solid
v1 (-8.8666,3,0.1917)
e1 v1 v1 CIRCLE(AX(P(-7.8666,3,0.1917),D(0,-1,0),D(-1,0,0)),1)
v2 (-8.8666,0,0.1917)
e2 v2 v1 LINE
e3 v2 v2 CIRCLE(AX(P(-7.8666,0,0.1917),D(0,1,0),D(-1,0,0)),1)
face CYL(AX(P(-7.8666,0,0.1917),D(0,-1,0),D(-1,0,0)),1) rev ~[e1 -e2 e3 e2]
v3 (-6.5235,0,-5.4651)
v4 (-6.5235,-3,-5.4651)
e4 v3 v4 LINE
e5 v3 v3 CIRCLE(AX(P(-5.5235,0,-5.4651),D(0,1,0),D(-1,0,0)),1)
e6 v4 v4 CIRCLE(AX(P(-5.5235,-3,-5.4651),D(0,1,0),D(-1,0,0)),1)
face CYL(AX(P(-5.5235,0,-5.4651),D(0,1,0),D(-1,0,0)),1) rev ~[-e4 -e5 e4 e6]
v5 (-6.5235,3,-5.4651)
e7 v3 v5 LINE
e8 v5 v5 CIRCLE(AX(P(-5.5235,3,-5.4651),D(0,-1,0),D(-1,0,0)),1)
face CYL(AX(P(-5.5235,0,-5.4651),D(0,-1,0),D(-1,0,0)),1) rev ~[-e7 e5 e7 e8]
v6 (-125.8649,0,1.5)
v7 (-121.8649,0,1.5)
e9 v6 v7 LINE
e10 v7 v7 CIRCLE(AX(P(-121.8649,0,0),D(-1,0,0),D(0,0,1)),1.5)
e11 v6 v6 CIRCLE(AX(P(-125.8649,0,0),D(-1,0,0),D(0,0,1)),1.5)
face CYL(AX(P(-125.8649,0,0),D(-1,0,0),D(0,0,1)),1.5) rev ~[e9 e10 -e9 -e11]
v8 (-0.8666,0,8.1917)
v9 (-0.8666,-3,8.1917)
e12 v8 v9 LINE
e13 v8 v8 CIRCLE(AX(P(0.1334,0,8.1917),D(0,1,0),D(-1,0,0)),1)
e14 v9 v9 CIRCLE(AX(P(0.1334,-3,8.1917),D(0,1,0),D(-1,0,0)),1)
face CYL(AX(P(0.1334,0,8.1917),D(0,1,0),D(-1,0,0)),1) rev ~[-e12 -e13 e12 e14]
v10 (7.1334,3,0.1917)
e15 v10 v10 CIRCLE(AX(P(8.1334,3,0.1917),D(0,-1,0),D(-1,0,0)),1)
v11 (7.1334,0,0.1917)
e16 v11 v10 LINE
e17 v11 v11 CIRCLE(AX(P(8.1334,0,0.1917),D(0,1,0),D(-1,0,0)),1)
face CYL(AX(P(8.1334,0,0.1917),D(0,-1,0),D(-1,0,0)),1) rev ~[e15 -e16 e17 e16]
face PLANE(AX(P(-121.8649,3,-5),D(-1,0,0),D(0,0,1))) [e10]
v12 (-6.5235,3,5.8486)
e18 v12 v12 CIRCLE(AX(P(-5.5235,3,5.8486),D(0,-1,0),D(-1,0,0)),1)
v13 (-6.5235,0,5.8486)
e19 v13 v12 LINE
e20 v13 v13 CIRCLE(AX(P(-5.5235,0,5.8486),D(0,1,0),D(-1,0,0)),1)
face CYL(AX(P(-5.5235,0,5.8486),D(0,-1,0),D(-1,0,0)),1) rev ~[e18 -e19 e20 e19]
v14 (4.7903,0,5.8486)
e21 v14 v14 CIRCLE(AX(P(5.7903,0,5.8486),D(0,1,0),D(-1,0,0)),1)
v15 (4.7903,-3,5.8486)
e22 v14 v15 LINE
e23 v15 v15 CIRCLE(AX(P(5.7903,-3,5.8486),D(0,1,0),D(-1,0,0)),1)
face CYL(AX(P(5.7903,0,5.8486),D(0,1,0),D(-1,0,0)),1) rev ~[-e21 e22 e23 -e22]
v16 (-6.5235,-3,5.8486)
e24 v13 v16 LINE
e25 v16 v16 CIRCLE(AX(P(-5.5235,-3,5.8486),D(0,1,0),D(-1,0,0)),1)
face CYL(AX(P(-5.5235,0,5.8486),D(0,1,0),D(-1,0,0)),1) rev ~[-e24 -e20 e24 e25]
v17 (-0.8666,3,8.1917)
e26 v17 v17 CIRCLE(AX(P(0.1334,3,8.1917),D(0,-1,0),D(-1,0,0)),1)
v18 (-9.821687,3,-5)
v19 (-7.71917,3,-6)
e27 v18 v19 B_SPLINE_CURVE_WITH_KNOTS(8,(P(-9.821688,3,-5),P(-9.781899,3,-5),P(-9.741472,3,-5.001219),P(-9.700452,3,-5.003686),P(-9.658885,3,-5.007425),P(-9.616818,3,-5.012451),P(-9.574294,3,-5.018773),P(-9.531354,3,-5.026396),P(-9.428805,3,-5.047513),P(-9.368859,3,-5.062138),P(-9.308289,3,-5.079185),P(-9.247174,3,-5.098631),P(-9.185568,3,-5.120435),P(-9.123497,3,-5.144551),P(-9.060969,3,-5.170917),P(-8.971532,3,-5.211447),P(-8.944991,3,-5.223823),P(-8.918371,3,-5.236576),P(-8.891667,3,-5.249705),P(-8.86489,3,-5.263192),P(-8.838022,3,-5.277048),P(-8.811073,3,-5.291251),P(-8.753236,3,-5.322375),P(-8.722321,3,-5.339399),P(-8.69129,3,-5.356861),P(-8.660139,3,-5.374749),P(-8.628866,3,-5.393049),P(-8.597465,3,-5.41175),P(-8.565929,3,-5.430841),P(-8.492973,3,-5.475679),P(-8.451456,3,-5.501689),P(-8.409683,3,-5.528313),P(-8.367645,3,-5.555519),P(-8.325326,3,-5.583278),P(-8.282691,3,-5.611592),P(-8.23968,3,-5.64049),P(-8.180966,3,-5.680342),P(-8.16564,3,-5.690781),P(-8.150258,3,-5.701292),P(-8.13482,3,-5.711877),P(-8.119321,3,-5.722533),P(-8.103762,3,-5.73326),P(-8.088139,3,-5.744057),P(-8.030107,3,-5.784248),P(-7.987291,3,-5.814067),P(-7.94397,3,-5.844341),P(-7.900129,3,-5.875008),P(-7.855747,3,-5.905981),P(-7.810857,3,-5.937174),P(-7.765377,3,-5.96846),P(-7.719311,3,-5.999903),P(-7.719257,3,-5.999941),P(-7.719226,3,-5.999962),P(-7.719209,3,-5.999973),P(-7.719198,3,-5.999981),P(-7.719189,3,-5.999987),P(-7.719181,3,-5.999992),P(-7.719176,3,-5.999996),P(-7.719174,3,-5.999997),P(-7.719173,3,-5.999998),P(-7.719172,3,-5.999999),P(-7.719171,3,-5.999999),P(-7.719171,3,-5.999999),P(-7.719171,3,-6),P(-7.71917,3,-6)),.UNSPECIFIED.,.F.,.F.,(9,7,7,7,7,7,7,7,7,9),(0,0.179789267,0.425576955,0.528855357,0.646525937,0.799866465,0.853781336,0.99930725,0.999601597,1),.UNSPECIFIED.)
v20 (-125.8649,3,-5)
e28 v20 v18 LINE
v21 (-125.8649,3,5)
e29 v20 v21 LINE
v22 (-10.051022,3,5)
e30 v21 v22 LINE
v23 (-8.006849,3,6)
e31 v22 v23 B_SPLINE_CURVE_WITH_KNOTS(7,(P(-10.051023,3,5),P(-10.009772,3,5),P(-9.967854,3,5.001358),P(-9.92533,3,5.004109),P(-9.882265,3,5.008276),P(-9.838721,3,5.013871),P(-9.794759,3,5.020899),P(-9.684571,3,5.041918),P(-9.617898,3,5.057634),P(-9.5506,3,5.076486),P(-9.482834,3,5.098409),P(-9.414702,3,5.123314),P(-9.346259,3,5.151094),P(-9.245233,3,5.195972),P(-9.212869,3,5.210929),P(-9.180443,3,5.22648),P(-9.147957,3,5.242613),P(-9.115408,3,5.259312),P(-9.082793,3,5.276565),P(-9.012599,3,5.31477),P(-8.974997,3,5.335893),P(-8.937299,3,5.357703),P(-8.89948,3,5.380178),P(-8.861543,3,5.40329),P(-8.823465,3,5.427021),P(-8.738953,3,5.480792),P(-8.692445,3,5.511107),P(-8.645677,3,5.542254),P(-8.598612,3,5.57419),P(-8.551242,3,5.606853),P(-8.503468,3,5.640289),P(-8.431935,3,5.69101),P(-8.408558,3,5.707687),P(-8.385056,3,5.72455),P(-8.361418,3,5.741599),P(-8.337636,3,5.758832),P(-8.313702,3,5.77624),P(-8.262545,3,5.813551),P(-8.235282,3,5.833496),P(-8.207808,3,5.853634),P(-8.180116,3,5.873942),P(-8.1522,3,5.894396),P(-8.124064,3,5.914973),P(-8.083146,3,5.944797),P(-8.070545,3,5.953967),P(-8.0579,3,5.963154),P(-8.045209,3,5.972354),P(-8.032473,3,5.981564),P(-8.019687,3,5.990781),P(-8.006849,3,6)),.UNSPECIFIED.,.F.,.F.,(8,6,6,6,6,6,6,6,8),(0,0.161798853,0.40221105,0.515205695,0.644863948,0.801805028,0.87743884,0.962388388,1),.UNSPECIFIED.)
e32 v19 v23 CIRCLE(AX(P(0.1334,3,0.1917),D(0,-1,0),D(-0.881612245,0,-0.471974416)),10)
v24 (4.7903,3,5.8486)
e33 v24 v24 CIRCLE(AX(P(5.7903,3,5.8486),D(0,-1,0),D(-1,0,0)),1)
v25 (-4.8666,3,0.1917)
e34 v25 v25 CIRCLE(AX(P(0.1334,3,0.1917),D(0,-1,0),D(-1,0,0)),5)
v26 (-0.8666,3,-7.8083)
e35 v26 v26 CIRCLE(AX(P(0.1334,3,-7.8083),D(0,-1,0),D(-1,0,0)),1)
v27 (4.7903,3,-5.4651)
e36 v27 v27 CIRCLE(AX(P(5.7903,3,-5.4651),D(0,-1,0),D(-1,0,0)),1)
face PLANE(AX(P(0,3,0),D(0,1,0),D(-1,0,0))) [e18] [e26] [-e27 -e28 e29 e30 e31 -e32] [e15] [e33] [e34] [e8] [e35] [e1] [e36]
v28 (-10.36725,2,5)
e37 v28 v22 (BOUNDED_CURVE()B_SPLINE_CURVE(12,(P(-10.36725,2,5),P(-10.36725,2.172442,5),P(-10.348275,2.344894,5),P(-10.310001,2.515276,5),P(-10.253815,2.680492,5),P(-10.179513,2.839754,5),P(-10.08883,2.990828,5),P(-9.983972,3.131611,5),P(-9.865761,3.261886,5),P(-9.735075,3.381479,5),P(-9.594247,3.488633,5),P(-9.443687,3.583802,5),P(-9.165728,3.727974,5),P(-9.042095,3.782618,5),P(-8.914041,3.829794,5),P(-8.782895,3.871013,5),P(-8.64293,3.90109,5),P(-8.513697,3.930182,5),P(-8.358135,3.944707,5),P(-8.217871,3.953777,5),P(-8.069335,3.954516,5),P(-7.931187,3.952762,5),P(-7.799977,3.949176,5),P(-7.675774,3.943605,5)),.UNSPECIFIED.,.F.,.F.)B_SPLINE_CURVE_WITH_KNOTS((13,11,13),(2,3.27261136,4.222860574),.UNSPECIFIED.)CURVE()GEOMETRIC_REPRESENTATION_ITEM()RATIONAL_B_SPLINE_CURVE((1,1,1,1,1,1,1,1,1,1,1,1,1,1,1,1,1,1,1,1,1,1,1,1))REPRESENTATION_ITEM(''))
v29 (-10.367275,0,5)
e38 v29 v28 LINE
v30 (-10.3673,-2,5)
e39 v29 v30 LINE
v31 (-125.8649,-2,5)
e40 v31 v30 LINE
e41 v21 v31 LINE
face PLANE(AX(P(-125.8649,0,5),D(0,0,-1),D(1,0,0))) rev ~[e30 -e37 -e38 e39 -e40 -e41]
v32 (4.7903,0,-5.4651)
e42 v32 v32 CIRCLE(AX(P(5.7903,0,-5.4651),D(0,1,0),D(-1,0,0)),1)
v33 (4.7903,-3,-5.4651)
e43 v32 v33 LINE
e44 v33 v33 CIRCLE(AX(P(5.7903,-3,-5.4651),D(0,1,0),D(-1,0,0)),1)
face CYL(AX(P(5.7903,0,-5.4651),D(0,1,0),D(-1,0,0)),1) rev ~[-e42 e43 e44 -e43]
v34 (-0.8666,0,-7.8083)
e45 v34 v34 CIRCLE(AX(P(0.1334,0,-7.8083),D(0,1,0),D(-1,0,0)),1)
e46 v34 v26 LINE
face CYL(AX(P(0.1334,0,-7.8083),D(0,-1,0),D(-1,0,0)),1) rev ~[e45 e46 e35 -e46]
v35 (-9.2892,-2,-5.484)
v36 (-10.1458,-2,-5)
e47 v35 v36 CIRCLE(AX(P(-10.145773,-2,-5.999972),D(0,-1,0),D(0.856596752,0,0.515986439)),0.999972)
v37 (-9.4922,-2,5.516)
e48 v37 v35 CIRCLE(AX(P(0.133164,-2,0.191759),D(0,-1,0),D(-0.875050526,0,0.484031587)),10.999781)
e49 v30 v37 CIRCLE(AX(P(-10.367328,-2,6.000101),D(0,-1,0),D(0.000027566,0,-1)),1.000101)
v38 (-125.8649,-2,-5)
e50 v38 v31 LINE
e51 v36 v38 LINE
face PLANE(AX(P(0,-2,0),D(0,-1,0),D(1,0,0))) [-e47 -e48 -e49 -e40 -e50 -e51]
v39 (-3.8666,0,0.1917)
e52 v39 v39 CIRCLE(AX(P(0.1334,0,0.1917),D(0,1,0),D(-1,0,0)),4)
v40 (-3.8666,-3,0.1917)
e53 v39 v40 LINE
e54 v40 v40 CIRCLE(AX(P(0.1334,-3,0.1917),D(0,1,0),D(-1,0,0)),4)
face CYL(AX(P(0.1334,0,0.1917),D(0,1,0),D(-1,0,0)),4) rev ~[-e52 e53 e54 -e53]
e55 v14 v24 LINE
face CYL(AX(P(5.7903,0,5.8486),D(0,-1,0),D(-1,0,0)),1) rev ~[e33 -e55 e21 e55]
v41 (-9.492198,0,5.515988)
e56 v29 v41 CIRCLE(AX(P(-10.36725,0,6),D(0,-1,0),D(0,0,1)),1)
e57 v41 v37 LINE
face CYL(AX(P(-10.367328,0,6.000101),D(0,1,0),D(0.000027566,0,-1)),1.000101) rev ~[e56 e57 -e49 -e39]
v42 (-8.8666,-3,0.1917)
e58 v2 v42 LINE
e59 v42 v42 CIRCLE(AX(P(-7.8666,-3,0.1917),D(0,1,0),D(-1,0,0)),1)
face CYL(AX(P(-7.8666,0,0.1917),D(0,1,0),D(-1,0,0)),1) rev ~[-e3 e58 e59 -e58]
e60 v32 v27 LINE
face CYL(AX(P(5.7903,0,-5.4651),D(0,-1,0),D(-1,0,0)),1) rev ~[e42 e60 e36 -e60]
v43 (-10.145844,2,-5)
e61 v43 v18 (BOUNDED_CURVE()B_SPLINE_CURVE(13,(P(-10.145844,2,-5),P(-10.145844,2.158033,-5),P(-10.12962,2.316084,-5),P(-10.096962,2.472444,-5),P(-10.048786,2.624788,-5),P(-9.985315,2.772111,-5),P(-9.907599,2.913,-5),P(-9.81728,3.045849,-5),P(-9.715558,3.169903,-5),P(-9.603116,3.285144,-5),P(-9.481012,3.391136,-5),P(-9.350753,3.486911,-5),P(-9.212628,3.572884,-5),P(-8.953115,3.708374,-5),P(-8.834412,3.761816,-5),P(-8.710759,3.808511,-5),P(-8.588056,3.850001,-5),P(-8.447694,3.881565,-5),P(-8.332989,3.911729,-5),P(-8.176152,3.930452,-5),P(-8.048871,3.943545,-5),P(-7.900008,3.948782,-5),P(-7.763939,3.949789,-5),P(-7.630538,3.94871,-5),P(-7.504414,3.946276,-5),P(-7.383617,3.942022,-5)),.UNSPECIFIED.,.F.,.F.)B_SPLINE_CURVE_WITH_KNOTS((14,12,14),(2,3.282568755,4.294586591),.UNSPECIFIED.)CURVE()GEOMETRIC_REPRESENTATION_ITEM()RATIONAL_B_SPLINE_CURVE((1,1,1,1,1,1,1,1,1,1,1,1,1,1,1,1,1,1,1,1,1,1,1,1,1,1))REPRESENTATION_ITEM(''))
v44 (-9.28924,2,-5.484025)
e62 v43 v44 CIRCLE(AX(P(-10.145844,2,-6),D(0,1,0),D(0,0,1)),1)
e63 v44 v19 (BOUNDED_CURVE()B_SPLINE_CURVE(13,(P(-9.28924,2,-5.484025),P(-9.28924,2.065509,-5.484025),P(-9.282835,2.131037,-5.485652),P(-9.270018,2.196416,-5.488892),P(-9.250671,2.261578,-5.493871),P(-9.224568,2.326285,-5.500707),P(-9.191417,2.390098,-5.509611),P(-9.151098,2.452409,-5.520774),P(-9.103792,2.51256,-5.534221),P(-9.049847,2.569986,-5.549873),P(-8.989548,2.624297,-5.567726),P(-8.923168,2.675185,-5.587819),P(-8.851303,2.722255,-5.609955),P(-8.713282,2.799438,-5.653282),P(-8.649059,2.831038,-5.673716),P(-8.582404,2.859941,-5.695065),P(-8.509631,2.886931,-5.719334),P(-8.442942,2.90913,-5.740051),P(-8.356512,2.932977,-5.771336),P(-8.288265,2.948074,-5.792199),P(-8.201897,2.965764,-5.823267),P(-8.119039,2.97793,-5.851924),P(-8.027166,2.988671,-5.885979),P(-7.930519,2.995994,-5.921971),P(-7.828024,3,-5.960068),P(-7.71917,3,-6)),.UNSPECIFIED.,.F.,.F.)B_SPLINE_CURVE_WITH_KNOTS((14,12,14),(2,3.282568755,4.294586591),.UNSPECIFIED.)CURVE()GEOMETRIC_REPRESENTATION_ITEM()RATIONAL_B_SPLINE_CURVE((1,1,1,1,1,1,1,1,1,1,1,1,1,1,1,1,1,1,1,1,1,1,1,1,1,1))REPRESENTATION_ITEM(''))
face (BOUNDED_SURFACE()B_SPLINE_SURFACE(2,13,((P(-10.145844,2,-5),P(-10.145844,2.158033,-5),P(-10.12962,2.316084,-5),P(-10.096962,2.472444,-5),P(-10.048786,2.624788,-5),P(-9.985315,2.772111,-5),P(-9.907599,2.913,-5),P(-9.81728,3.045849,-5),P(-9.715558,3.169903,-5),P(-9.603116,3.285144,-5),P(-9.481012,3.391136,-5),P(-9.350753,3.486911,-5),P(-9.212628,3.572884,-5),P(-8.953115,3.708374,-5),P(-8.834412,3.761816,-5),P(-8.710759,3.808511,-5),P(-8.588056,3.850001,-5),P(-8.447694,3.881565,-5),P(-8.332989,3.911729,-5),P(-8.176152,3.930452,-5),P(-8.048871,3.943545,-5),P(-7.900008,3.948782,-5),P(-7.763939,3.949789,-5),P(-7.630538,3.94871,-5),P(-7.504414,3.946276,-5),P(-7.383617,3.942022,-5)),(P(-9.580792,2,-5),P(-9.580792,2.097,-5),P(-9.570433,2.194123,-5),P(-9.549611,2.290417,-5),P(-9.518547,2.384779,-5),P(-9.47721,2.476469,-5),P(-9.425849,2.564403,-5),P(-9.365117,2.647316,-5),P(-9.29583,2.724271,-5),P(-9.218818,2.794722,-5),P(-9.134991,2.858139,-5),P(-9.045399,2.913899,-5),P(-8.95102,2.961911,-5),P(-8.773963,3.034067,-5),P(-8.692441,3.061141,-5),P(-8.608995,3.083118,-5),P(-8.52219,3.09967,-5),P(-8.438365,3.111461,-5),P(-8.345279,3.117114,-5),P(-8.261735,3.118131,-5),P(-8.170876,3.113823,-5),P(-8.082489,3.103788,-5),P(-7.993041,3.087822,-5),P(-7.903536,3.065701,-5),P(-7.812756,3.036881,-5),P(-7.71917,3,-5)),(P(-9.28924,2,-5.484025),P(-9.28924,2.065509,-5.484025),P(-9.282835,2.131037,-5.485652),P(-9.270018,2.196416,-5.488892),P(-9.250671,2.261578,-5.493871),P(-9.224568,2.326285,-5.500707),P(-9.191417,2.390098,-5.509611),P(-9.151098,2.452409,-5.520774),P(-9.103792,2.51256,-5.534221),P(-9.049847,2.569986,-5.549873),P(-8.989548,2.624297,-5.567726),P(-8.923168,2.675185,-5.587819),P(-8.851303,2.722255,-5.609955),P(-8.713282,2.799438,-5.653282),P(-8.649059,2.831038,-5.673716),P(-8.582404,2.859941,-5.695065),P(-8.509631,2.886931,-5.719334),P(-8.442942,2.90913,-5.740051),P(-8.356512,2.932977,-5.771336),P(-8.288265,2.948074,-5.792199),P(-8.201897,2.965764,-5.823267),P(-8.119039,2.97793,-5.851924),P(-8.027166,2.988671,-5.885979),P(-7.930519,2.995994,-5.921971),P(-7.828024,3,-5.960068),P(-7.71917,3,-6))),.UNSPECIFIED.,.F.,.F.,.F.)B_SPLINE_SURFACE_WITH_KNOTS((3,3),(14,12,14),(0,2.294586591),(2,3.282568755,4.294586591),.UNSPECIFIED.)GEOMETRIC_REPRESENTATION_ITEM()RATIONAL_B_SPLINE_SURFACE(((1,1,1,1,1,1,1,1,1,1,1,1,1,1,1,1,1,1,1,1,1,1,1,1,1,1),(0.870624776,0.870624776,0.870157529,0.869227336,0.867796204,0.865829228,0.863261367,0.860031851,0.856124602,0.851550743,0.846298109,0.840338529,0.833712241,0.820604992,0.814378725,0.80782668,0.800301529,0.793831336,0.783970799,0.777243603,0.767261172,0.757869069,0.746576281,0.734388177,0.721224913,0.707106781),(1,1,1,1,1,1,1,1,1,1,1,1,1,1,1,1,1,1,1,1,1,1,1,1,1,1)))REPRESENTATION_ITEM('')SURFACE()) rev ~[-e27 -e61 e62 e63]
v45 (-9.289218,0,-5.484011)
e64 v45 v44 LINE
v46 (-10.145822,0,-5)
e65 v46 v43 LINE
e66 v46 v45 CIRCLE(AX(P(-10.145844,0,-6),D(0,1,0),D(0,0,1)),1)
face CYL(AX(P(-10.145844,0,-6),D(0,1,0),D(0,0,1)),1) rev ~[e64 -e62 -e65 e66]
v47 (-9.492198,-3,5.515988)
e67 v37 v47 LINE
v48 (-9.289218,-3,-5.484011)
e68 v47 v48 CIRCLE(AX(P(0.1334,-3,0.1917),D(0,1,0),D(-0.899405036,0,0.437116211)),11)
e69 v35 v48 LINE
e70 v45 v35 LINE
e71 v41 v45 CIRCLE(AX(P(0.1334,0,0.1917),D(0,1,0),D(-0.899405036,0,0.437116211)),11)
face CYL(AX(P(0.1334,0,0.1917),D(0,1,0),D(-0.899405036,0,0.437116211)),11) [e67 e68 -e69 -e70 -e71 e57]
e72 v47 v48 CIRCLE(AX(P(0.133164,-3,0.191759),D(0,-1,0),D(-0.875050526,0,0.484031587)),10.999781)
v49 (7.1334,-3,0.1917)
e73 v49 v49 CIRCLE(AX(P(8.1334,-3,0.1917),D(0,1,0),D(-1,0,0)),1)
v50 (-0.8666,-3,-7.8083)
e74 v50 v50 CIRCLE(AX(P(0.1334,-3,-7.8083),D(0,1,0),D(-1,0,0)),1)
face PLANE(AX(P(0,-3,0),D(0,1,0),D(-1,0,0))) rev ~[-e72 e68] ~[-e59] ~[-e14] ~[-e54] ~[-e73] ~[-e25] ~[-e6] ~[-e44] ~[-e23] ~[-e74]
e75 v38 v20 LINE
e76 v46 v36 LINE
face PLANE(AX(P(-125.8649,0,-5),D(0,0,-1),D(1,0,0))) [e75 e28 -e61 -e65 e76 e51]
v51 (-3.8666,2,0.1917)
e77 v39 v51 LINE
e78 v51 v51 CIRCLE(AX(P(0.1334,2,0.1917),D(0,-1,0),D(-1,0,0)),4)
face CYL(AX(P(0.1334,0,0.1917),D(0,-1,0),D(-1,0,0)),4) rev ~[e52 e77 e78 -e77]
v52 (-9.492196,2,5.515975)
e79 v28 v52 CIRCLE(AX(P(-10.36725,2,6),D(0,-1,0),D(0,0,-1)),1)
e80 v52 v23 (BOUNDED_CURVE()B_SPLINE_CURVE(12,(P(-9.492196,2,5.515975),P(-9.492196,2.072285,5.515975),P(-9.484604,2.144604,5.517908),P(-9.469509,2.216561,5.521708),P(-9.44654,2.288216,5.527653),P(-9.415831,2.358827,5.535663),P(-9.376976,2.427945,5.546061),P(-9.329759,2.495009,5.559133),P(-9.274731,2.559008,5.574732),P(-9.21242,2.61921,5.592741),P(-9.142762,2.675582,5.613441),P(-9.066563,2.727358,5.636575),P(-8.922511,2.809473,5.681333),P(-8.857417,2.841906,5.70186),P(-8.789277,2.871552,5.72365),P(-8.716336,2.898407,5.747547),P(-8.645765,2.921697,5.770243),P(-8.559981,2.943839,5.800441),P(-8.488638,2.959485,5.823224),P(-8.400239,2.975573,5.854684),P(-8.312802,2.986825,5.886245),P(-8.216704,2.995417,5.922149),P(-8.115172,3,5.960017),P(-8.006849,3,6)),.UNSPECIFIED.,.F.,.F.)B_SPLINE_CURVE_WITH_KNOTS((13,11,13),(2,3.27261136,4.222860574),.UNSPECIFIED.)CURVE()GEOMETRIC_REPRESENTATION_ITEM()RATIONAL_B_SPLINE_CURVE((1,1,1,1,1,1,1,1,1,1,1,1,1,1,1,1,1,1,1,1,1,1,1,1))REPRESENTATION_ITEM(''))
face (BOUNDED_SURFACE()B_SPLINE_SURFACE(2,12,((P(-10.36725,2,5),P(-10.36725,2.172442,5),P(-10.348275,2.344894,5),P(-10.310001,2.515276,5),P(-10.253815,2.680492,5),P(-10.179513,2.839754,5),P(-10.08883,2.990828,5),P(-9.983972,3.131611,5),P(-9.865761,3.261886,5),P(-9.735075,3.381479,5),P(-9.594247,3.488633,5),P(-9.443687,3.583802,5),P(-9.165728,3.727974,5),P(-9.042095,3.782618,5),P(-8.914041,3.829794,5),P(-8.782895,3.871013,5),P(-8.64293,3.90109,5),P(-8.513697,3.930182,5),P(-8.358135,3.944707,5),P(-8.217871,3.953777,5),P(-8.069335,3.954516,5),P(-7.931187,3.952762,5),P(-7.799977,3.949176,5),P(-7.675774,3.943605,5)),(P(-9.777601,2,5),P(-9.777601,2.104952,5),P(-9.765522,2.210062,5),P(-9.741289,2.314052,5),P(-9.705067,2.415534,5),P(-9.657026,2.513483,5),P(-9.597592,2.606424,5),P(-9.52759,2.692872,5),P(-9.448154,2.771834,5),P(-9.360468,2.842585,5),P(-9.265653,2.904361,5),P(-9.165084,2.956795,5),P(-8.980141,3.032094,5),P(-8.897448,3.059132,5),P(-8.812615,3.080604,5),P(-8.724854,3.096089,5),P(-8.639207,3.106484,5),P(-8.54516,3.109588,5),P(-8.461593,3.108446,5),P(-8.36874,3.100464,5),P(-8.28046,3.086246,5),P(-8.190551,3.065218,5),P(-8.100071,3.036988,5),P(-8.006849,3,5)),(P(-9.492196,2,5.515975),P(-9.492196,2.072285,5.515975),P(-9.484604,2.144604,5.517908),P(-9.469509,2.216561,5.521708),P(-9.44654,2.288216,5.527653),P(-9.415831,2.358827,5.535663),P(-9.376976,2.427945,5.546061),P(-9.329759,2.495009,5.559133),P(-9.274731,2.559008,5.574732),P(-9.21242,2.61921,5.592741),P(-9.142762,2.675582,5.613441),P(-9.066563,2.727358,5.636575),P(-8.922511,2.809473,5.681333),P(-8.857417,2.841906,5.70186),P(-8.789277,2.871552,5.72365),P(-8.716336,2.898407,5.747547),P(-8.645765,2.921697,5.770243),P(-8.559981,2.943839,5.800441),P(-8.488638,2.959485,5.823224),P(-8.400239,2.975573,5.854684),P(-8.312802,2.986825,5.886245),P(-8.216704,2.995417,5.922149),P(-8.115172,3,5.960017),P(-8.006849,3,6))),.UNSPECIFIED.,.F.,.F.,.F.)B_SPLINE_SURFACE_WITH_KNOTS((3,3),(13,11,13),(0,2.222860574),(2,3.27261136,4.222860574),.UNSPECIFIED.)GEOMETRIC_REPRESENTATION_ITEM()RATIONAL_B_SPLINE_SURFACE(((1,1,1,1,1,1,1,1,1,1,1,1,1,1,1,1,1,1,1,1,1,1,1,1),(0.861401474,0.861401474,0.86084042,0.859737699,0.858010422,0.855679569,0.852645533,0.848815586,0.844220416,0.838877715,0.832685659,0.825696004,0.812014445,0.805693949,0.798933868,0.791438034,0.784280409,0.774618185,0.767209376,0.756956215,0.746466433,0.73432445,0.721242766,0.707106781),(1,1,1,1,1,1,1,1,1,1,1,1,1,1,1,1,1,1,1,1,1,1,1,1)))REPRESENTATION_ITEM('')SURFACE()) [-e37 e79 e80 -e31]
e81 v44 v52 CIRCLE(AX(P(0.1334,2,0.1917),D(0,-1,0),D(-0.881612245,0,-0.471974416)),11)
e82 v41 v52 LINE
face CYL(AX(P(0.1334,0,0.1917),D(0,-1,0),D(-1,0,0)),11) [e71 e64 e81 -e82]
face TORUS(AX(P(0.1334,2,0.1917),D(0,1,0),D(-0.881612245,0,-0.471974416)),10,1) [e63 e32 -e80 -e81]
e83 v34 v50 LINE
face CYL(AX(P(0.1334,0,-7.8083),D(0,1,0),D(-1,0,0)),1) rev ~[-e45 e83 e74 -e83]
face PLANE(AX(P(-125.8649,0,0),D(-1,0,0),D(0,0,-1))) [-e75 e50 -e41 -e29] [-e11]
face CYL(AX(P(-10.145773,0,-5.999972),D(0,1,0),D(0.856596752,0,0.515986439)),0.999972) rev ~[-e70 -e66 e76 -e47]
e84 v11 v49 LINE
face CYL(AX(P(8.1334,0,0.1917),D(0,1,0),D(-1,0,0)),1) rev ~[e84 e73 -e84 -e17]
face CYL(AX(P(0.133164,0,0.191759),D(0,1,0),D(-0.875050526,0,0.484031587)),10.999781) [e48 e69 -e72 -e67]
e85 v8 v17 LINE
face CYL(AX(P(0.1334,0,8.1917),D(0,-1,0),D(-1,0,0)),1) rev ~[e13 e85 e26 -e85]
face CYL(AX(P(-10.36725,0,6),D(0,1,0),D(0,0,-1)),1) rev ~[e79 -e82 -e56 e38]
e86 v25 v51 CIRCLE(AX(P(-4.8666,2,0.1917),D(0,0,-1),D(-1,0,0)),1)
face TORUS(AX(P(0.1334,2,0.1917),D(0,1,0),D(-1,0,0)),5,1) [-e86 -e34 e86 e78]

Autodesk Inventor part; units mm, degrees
ref_plane "YZ Plane" through (0, 0, 0) normal (1, 0, 0) x (0, 1, 0)
ref_plane "XZ Plane" through (0, 0, 0) normal (0, 1, 0) x (-1, 0, 0)
ref_plane "XY Plane" through (0, 0, 0) normal (0, 0, 1) x (1, 0, 0)
sketch "스케치1" plane through (0, 0, 0) normal (0, 1, 0) x (-1, 0, 0)
  circle A0 centre (-0.1334, 0.1917) radius 4
  circle A1 centre (-0.1334, 0.1917) radius 11
  circle A2 centre (-0.1334, 0.1917) radius 11
  circle A3 centre (-0.1334, 0.1917) radius 8
  circle A4 centre (-0.1334, 8.1917) radius 1
  circle A5 centre (-5.7903, 5.8486) radius 1
  circle A6 centre (-8.1334, 0.1917) radius 1
  circle A7 centre (-5.7903, -5.4651) radius 1
  circle A8 centre (-0.1334, -7.8083) radius 1
  circle A9 centre (5.5235, -5.4651) radius 1
  circle A10 centre (7.8666, 0.1917) radius 1
  circle A11 centre (5.5235, 5.8486) radius 1
  line L0 (0, 0) -> (0, -10.8075)
  line L1 (10.8649, 0) -> (125.8649, 0)
  line L2 (125.8649, 0) -> (125.8649, -5)
  line L3 (125.8649, -5) -> (9.5643, -5)
  line L4 (125.8649, 0) -> (125.8649, 5)
  line L5 (125.8649, 5) -> (9.7601, 5)
  point P0 (9.5643, -5)
  point P1 (9.7601, 5)
  dimension "d2" = 16
  dimension "d3" = 2
  dimension "d4" = 360
  dimension "d5" = 115
  dimension "d6" = 5
  dimension "d7" = 5
extrude "돌출1" add sketch "스케치1" along normal blind 3 contours A1 | A1 L5 L4 L1 | L1 L2 L3 A1 | A10 A3 A9 A8 A7 A6 A5 A4 A11
fillet "모깎기1" radius 1 4 edges at (-9.7601, 1.5, 5) (-9.5643, 1.5, -5) (4.1334, 3, 0.1917) (11.1313, 3, 0.407)
sketch "스케치3" plane through (0, 0, 0) normal (0, -1, 0) x (1, 0, 0)
  arc A0 (-10.3673, 5) -> (-9.4922, 5.516) centre (-10.3673, 6) ccw projected
  arc A1 (-9.2892, -5.484) -> (-9.4922, 5.516) centre (0.1334, 0.1917) ccw projected
  arc A2 (-9.4922, 5.516) -> (-9.2892, -5.484) centre (0.1334, 0.1917) ccw
  arc A3 (-10.3673, 5) -> (-9.4922, 5.516) centre (-10.3673, 6) ccw
  arc A4 (-9.2892, -5.484) -> (-10.1458, -5) centre (-10.1458, -6) ccw projected
  arc A5 (-9.2892, -5.484) -> (-10.1458, -5) centre (-10.1458, -6) ccw
  line L0 (-125.8649, -5) -> (-125.8649, 5) projected
  line L1 (-10.1458, -5) -> (-125.8649, -5)
  line L2 (-125.8649, -5) -> (-125.8649, 5)
  line L3 (-125.8649, 5) -> (-10.3673, 5)
  point P0 (0, 0)
extrude "돌출3" add sketch "스케치3" along normal blind 2 contours A0 A2 A4 L1 L0 L3
thicken "두껍게 하기1" operation add thickness 3 both sides no extend neighbours no toward (0, -1, 0) faces at (3.6327, 0, 8.2973)
sketch "스케치4" plane through (-125.8649, 3, -5) normal (-1, 0, 0) x (0, 0, 1)
  circle A0 centre (5, -3) radius 1.5
  dimension "d20" = 3
extrude "돌출4" cut sketch "스케치4" against normal blind 4
properties part number "팔" material "ABS 플라스틱"
